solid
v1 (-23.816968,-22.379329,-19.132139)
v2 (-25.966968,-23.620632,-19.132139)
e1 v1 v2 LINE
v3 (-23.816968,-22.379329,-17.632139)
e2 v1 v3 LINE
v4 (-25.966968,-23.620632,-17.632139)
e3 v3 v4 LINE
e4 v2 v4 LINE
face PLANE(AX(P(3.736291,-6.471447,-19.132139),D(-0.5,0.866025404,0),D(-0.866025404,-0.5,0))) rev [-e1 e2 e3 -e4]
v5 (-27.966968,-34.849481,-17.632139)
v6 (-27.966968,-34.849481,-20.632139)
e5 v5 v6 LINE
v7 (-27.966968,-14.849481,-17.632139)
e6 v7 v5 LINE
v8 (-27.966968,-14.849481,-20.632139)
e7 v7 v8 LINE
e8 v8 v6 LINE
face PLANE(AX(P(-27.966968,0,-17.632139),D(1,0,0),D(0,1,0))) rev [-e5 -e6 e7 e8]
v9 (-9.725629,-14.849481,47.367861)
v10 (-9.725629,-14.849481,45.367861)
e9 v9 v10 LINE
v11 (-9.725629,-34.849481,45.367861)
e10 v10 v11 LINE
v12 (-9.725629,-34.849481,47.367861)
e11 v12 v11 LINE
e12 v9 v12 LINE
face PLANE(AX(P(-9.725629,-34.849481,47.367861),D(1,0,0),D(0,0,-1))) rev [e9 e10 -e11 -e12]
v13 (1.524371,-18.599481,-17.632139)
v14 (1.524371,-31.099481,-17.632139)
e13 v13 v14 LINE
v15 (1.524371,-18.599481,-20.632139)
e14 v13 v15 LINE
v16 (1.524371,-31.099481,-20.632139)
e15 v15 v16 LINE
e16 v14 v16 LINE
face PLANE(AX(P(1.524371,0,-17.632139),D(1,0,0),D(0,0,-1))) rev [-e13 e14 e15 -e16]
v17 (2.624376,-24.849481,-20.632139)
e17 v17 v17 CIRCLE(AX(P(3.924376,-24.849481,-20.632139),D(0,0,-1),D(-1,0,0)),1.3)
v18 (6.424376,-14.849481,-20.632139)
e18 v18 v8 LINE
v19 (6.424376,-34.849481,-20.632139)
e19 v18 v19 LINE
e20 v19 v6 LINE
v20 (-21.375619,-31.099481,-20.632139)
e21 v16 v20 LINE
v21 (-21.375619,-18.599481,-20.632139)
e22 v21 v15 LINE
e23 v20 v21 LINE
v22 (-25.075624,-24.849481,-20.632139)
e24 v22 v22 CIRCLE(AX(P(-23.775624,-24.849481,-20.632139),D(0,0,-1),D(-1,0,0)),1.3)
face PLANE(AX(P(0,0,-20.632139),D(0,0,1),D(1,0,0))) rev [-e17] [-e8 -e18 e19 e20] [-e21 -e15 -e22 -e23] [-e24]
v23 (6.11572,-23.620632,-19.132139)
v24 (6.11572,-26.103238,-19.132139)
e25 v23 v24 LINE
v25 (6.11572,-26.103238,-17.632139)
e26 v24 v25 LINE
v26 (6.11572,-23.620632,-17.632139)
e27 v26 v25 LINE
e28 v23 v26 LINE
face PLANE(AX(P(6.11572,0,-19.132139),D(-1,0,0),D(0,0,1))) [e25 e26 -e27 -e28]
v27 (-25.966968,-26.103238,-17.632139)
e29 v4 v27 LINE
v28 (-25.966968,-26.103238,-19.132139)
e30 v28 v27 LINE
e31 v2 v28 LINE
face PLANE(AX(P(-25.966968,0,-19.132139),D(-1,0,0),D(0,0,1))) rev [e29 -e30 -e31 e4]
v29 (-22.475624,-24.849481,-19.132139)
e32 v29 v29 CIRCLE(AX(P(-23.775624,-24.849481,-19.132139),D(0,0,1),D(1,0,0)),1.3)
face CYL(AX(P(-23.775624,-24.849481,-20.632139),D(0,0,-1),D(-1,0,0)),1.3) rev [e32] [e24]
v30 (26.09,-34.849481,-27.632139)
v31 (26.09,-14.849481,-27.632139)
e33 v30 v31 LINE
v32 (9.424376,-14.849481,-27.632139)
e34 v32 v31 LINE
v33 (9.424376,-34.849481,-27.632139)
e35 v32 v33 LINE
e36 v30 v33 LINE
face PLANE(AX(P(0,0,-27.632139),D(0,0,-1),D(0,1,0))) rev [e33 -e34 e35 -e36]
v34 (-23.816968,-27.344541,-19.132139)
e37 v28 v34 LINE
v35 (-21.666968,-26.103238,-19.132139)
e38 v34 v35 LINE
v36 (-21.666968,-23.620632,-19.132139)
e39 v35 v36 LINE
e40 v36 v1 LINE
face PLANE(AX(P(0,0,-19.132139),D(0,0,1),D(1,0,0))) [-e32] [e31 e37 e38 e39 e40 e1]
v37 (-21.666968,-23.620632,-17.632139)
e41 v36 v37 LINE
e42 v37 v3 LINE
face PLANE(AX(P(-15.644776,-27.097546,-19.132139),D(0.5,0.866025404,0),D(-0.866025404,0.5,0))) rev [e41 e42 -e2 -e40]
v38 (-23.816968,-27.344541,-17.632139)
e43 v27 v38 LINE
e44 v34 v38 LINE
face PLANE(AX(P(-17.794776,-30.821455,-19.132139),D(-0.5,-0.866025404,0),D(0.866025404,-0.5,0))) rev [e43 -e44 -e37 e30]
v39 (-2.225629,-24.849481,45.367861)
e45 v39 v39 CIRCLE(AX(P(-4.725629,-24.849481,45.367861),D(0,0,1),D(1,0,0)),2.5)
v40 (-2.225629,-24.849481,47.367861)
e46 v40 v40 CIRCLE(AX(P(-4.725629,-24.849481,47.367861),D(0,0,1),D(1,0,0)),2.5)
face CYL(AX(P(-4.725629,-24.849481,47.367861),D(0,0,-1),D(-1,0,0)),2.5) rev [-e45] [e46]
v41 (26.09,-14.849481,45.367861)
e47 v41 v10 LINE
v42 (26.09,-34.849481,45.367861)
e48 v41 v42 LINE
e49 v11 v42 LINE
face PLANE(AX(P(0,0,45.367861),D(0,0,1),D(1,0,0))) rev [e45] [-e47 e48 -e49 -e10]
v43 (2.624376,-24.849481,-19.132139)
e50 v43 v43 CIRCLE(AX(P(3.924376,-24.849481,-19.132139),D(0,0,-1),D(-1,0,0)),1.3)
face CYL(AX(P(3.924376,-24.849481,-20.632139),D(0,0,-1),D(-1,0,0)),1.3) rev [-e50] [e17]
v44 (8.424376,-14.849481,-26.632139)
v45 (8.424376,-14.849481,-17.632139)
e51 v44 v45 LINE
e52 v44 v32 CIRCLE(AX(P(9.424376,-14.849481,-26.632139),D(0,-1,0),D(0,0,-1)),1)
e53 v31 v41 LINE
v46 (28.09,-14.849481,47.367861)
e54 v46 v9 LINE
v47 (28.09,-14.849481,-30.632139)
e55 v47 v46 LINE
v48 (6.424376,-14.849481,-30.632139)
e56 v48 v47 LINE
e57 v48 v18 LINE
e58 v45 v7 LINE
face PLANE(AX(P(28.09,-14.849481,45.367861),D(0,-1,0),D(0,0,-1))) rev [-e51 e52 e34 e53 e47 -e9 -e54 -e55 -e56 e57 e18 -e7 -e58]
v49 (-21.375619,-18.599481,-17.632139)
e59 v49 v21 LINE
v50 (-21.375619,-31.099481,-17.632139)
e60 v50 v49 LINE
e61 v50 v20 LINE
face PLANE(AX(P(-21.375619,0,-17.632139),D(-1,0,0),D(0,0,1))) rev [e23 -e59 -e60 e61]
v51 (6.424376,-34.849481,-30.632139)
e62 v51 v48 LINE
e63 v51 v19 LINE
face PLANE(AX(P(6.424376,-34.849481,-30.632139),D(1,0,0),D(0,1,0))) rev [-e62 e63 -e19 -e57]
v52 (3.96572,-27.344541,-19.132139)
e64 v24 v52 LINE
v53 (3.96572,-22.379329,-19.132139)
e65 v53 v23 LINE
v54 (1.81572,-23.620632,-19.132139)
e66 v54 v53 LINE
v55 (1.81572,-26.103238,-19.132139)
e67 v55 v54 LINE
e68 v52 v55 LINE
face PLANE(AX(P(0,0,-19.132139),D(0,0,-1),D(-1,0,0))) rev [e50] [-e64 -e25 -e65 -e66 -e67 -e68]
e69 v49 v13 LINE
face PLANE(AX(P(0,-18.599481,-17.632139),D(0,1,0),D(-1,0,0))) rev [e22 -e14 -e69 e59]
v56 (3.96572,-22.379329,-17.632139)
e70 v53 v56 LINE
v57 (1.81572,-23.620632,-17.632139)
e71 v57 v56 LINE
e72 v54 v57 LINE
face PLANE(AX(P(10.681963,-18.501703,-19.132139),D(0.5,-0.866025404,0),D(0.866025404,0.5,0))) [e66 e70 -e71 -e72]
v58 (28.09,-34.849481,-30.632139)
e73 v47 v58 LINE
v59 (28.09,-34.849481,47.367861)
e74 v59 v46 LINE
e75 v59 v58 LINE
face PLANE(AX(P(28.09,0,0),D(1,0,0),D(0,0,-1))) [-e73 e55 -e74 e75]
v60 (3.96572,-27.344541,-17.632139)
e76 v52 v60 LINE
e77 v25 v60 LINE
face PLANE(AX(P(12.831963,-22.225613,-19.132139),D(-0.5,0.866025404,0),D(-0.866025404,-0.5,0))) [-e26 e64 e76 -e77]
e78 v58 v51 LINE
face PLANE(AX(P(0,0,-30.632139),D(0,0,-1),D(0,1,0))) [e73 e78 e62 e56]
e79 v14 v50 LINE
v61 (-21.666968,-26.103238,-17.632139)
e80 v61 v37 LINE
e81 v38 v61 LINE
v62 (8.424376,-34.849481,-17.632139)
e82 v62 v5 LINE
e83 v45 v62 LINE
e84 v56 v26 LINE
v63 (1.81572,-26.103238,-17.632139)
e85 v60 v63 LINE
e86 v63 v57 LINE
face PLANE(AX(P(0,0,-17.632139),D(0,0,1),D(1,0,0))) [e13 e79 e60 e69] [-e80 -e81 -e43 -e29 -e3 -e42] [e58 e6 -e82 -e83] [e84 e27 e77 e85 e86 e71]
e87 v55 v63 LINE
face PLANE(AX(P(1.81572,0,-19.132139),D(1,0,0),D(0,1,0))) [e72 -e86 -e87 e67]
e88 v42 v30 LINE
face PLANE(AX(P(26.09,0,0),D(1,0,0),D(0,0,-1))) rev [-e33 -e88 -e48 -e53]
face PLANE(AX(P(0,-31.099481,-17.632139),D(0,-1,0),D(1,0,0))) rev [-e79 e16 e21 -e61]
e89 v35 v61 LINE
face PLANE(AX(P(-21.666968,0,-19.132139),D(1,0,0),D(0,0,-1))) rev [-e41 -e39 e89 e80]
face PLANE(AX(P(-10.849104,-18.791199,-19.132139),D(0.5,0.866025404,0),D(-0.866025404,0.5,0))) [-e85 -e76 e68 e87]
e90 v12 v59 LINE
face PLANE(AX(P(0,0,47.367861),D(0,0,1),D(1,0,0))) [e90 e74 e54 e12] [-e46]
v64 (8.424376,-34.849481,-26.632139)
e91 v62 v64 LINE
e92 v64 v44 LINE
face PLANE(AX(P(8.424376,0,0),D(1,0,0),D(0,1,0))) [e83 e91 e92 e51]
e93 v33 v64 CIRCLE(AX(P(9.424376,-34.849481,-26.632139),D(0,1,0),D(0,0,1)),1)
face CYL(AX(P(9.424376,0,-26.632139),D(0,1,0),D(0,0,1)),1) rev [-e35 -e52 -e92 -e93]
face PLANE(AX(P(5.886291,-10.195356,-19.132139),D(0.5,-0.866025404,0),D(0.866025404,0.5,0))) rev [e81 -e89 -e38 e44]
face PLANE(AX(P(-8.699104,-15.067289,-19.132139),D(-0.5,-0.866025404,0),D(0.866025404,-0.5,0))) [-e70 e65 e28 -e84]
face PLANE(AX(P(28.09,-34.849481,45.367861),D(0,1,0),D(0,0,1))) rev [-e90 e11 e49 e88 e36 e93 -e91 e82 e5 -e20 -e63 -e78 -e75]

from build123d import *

# Parameters (mm, degrees)
BOSS_EXTRUDE1_START       = 26.09
SKETCH2_W                 = 20
SKETCH2_H                 = 73
BOSS_EXTRUDE1_DEPTH       = 2
SKETCH3_W                 = 37.815629263
SKETCH3_H                 = 20
SKETCH3_R                 = 2.5
BOSS_EXTRUDE2_DEPTH       = 2
BOSS_EXTRUDE3_START       = -3
BOSS_EXTRUDE3_OUTLINE_W   = 34.391343997
BOSS_EXTRUDE3_OUTLINE_H   = 20
BOSS_EXTRUDE3_OUTLINE_R   = 1.1
BOSS_EXTRUDE3_OUTLINE_W_2 = 22.89999
BOSS_EXTRUDE3_OUTLINE_H_2 = 12.5
BOSS_EXTRUDE3_DEPTH       = 3
SKETCH7_W                 = 10
SKETCH7_H                 = 20
BOSS_EXTRUDE4_DEPTH       = 2
SKETCH8_W                 = 21.665624263
SKETCH8_H                 = 20
BOSS_EXTRUDE5_DEPTH       = 3
FILLET1_R                 = 1
CUT_EXTRUDE5_START        = -3
SKETCH4_3_R               = 1.1
CUT_EXTRUDE5_DEPTH        = 1.5
M2_CLEARANCE_HOLE1_D      = 2.6
M2_CLEARANCE_HOLE1_DEPTH  = 3
M2_CLEARANCE_HOLE1_TIP    = 0.781118805


# Read off the part's stored shape, not the designer's step: Boss-Extrude3
with BuildPart() as part:
    # Sketch2 → Boss-Extrude1 (new body)
    with BuildSketch(Plane(origin=(0, 0, 13.2), x_dir=(0, 1, 0), z_dir=(1, 0, 0)).offset(BOSS_EXTRUDE1_START)):
        with Locations((-24.849481376, -4.332139258)):
            Rectangle(SKETCH2_W, SKETCH2_H)
    extrude(amount=BOSS_EXTRUDE1_DEPTH)

    # Sketch3 → Boss-Extrude2 (add)
    with BuildSketch(Plane.XY.offset(45.367860742)):
        with Locations((9.182185369, -24.849481376)):
            Rectangle(SKETCH3_W, SKETCH3_H)
        with Locations((-4.725629263, -24.849481376)):
            Circle(SKETCH3_R, mode=Mode.SUBTRACT)
    extrude(amount=BOSS_EXTRUDE2_DEPTH)



with BuildPart() as body_2:
    # Boss-Extrude3 outline → Boss-Extrude3 (new body)
    with BuildSketch(Plane(origin=(0, 0, -20.632139258), x_dir=(-1, 0, 0), z_dir=(0, 0, -1)).offset(BOSS_EXTRUDE3_START)):
        with Locations((10.771296262, -24.849481376)):
            Rectangle(BOSS_EXTRUDE3_OUTLINE_W, BOSS_EXTRUDE3_OUTLINE_H)
        with Locations((-3.924375737, -24.849481376)):
            Circle(BOSS_EXTRUDE3_OUTLINE_R, mode=Mode.SUBTRACT)
        with Locations((9.925624263, -24.849481376)):
            Rectangle(BOSS_EXTRUDE3_OUTLINE_W_2, BOSS_EXTRUDE3_OUTLINE_H_2, mode=Mode.SUBTRACT)
        with Locations((23.775624263, -24.849481376)):
            Circle(BOSS_EXTRUDE3_OUTLINE_R, mode=Mode.SUBTRACT)
    extrude(amount=BOSS_EXTRUDE3_DEPTH)

    # Sketch7 → Boss-Extrude4 (add)
    with BuildSketch(Plane(origin=(6.424375737, 0, 0), x_dir=(0, 0, -1), z_dir=(1, 0, 0))):
        with Locations((22.632139258, -24.849481376)):
            Rectangle(SKETCH7_W, SKETCH7_H)
    extrude(amount=BOSS_EXTRUDE4_DEPTH)


with BuildPart() as part_1:
    add(part.part)

    add(body_2.part)  # Boss-Extrude5 merges body 2
    # Sketch8 → Boss-Extrude5 (add)
    with BuildSketch(Plane(origin=(0, 0, -27.632139258), x_dir=(-1, 0, 0), z_dir=(0, 0, -1))):
        with Locations((-17.257187869, -24.849481376)):
            Rectangle(SKETCH8_W, SKETCH8_H)
    extrude(amount=BOSS_EXTRUDE5_DEPTH)

    # Fillet1
    fillet1_edges = [part_1.edges().sort_by_distance(p)[0] for p in [
        (8.424375737, -24.849481376, -27.632139258),
    ]]
    fillet(fillet1_edges, radius=FILLET1_R)

    # Sketch4<3> → Cut-Extrude5 (cut)
    # profile 1 of 4: a face of its own
    with BuildSketch(Plane(origin=(0, 0, -20.632139258), x_dir=(-1, 0, 0), z_dir=(0, 0, -1)).offset(CUT_EXTRUDE5_START)):
        Polygon((-3.965719734, -22.379328504), (-1.815719734, -23.620631583), (-1.815719734, -26.103237741), (-3.965719734, -27.344540819), (-6.115719734, -26.103237741), (-6.115719734, -23.620631583), align=None)
        with Locations((-3.924375737, -24.849481376)):
            Circle(SKETCH4_3_R, mode=Mode.SUBTRACT)
    # profile 2 of 4: a face of its own
    with BuildSketch(Plane(origin=(0, 0, -20.632139258), x_dir=(-1, 0, 0), z_dir=(0, 0, -1)).offset(CUT_EXTRUDE5_START)):
        Polygon((23.81696826, -22.379328504), (21.66696826, -23.620631583), (21.66696826, -26.103237741), (23.81696826, -27.344540819), (25.96696826, -26.103237741), (25.96696826, -23.620631583), align=None)
        with Locations(Location((23.775624263, -24.849481376, 0), (0, 0, 180))):
            Circle(SKETCH4_3_R, mode=Mode.SUBTRACT)
    # profile 3 of 4: a face of its own
    with BuildSketch(Plane(origin=(0, 0, -20.632139258), x_dir=(-1, 0, 0), z_dir=(0, 0, -1)).offset(CUT_EXTRUDE5_START)):
        with Locations((-3.924375737, -24.849481376)):
            Circle(SKETCH4_3_R)
    # profile 4 of 4: a face of its own
    with BuildSketch(Plane(origin=(0, 0, -20.632139258), x_dir=(-1, 0, 0), z_dir=(0, 0, -1)).offset(CUT_EXTRUDE5_START)):
        with Locations(Location((23.775624263, -24.849481376, 0), (0, 0, 180))):
            Circle(SKETCH4_3_R)
    extrude(amount=CUT_EXTRUDE5_DEPTH, mode=Mode.SUBTRACT)

    # M2 Clearance Hole1
    with Locations(Plane(origin=(0, 0, -20.632139258), x_dir=(-1, 0, 0), z_dir=(0, 0, -1))):
        with Locations((-3.924375737, -24.849481376), (23.775624263, -24.849481376)):
            Hole(M2_CLEARANCE_HOLE1_D / 2, depth=M2_CLEARANCE_HOLE1_DEPTH)
            with Locations((0, 0, -(M2_CLEARANCE_HOLE1_DEPTH + M2_CLEARANCE_HOLE1_TIP / 2))):  # 118° drill point
                Cone(0, M2_CLEARANCE_HOLE1_D / 2, M2_CLEARANCE_HOLE1_TIP, mode=Mode.SUBTRACT)


solid = part_1.part
